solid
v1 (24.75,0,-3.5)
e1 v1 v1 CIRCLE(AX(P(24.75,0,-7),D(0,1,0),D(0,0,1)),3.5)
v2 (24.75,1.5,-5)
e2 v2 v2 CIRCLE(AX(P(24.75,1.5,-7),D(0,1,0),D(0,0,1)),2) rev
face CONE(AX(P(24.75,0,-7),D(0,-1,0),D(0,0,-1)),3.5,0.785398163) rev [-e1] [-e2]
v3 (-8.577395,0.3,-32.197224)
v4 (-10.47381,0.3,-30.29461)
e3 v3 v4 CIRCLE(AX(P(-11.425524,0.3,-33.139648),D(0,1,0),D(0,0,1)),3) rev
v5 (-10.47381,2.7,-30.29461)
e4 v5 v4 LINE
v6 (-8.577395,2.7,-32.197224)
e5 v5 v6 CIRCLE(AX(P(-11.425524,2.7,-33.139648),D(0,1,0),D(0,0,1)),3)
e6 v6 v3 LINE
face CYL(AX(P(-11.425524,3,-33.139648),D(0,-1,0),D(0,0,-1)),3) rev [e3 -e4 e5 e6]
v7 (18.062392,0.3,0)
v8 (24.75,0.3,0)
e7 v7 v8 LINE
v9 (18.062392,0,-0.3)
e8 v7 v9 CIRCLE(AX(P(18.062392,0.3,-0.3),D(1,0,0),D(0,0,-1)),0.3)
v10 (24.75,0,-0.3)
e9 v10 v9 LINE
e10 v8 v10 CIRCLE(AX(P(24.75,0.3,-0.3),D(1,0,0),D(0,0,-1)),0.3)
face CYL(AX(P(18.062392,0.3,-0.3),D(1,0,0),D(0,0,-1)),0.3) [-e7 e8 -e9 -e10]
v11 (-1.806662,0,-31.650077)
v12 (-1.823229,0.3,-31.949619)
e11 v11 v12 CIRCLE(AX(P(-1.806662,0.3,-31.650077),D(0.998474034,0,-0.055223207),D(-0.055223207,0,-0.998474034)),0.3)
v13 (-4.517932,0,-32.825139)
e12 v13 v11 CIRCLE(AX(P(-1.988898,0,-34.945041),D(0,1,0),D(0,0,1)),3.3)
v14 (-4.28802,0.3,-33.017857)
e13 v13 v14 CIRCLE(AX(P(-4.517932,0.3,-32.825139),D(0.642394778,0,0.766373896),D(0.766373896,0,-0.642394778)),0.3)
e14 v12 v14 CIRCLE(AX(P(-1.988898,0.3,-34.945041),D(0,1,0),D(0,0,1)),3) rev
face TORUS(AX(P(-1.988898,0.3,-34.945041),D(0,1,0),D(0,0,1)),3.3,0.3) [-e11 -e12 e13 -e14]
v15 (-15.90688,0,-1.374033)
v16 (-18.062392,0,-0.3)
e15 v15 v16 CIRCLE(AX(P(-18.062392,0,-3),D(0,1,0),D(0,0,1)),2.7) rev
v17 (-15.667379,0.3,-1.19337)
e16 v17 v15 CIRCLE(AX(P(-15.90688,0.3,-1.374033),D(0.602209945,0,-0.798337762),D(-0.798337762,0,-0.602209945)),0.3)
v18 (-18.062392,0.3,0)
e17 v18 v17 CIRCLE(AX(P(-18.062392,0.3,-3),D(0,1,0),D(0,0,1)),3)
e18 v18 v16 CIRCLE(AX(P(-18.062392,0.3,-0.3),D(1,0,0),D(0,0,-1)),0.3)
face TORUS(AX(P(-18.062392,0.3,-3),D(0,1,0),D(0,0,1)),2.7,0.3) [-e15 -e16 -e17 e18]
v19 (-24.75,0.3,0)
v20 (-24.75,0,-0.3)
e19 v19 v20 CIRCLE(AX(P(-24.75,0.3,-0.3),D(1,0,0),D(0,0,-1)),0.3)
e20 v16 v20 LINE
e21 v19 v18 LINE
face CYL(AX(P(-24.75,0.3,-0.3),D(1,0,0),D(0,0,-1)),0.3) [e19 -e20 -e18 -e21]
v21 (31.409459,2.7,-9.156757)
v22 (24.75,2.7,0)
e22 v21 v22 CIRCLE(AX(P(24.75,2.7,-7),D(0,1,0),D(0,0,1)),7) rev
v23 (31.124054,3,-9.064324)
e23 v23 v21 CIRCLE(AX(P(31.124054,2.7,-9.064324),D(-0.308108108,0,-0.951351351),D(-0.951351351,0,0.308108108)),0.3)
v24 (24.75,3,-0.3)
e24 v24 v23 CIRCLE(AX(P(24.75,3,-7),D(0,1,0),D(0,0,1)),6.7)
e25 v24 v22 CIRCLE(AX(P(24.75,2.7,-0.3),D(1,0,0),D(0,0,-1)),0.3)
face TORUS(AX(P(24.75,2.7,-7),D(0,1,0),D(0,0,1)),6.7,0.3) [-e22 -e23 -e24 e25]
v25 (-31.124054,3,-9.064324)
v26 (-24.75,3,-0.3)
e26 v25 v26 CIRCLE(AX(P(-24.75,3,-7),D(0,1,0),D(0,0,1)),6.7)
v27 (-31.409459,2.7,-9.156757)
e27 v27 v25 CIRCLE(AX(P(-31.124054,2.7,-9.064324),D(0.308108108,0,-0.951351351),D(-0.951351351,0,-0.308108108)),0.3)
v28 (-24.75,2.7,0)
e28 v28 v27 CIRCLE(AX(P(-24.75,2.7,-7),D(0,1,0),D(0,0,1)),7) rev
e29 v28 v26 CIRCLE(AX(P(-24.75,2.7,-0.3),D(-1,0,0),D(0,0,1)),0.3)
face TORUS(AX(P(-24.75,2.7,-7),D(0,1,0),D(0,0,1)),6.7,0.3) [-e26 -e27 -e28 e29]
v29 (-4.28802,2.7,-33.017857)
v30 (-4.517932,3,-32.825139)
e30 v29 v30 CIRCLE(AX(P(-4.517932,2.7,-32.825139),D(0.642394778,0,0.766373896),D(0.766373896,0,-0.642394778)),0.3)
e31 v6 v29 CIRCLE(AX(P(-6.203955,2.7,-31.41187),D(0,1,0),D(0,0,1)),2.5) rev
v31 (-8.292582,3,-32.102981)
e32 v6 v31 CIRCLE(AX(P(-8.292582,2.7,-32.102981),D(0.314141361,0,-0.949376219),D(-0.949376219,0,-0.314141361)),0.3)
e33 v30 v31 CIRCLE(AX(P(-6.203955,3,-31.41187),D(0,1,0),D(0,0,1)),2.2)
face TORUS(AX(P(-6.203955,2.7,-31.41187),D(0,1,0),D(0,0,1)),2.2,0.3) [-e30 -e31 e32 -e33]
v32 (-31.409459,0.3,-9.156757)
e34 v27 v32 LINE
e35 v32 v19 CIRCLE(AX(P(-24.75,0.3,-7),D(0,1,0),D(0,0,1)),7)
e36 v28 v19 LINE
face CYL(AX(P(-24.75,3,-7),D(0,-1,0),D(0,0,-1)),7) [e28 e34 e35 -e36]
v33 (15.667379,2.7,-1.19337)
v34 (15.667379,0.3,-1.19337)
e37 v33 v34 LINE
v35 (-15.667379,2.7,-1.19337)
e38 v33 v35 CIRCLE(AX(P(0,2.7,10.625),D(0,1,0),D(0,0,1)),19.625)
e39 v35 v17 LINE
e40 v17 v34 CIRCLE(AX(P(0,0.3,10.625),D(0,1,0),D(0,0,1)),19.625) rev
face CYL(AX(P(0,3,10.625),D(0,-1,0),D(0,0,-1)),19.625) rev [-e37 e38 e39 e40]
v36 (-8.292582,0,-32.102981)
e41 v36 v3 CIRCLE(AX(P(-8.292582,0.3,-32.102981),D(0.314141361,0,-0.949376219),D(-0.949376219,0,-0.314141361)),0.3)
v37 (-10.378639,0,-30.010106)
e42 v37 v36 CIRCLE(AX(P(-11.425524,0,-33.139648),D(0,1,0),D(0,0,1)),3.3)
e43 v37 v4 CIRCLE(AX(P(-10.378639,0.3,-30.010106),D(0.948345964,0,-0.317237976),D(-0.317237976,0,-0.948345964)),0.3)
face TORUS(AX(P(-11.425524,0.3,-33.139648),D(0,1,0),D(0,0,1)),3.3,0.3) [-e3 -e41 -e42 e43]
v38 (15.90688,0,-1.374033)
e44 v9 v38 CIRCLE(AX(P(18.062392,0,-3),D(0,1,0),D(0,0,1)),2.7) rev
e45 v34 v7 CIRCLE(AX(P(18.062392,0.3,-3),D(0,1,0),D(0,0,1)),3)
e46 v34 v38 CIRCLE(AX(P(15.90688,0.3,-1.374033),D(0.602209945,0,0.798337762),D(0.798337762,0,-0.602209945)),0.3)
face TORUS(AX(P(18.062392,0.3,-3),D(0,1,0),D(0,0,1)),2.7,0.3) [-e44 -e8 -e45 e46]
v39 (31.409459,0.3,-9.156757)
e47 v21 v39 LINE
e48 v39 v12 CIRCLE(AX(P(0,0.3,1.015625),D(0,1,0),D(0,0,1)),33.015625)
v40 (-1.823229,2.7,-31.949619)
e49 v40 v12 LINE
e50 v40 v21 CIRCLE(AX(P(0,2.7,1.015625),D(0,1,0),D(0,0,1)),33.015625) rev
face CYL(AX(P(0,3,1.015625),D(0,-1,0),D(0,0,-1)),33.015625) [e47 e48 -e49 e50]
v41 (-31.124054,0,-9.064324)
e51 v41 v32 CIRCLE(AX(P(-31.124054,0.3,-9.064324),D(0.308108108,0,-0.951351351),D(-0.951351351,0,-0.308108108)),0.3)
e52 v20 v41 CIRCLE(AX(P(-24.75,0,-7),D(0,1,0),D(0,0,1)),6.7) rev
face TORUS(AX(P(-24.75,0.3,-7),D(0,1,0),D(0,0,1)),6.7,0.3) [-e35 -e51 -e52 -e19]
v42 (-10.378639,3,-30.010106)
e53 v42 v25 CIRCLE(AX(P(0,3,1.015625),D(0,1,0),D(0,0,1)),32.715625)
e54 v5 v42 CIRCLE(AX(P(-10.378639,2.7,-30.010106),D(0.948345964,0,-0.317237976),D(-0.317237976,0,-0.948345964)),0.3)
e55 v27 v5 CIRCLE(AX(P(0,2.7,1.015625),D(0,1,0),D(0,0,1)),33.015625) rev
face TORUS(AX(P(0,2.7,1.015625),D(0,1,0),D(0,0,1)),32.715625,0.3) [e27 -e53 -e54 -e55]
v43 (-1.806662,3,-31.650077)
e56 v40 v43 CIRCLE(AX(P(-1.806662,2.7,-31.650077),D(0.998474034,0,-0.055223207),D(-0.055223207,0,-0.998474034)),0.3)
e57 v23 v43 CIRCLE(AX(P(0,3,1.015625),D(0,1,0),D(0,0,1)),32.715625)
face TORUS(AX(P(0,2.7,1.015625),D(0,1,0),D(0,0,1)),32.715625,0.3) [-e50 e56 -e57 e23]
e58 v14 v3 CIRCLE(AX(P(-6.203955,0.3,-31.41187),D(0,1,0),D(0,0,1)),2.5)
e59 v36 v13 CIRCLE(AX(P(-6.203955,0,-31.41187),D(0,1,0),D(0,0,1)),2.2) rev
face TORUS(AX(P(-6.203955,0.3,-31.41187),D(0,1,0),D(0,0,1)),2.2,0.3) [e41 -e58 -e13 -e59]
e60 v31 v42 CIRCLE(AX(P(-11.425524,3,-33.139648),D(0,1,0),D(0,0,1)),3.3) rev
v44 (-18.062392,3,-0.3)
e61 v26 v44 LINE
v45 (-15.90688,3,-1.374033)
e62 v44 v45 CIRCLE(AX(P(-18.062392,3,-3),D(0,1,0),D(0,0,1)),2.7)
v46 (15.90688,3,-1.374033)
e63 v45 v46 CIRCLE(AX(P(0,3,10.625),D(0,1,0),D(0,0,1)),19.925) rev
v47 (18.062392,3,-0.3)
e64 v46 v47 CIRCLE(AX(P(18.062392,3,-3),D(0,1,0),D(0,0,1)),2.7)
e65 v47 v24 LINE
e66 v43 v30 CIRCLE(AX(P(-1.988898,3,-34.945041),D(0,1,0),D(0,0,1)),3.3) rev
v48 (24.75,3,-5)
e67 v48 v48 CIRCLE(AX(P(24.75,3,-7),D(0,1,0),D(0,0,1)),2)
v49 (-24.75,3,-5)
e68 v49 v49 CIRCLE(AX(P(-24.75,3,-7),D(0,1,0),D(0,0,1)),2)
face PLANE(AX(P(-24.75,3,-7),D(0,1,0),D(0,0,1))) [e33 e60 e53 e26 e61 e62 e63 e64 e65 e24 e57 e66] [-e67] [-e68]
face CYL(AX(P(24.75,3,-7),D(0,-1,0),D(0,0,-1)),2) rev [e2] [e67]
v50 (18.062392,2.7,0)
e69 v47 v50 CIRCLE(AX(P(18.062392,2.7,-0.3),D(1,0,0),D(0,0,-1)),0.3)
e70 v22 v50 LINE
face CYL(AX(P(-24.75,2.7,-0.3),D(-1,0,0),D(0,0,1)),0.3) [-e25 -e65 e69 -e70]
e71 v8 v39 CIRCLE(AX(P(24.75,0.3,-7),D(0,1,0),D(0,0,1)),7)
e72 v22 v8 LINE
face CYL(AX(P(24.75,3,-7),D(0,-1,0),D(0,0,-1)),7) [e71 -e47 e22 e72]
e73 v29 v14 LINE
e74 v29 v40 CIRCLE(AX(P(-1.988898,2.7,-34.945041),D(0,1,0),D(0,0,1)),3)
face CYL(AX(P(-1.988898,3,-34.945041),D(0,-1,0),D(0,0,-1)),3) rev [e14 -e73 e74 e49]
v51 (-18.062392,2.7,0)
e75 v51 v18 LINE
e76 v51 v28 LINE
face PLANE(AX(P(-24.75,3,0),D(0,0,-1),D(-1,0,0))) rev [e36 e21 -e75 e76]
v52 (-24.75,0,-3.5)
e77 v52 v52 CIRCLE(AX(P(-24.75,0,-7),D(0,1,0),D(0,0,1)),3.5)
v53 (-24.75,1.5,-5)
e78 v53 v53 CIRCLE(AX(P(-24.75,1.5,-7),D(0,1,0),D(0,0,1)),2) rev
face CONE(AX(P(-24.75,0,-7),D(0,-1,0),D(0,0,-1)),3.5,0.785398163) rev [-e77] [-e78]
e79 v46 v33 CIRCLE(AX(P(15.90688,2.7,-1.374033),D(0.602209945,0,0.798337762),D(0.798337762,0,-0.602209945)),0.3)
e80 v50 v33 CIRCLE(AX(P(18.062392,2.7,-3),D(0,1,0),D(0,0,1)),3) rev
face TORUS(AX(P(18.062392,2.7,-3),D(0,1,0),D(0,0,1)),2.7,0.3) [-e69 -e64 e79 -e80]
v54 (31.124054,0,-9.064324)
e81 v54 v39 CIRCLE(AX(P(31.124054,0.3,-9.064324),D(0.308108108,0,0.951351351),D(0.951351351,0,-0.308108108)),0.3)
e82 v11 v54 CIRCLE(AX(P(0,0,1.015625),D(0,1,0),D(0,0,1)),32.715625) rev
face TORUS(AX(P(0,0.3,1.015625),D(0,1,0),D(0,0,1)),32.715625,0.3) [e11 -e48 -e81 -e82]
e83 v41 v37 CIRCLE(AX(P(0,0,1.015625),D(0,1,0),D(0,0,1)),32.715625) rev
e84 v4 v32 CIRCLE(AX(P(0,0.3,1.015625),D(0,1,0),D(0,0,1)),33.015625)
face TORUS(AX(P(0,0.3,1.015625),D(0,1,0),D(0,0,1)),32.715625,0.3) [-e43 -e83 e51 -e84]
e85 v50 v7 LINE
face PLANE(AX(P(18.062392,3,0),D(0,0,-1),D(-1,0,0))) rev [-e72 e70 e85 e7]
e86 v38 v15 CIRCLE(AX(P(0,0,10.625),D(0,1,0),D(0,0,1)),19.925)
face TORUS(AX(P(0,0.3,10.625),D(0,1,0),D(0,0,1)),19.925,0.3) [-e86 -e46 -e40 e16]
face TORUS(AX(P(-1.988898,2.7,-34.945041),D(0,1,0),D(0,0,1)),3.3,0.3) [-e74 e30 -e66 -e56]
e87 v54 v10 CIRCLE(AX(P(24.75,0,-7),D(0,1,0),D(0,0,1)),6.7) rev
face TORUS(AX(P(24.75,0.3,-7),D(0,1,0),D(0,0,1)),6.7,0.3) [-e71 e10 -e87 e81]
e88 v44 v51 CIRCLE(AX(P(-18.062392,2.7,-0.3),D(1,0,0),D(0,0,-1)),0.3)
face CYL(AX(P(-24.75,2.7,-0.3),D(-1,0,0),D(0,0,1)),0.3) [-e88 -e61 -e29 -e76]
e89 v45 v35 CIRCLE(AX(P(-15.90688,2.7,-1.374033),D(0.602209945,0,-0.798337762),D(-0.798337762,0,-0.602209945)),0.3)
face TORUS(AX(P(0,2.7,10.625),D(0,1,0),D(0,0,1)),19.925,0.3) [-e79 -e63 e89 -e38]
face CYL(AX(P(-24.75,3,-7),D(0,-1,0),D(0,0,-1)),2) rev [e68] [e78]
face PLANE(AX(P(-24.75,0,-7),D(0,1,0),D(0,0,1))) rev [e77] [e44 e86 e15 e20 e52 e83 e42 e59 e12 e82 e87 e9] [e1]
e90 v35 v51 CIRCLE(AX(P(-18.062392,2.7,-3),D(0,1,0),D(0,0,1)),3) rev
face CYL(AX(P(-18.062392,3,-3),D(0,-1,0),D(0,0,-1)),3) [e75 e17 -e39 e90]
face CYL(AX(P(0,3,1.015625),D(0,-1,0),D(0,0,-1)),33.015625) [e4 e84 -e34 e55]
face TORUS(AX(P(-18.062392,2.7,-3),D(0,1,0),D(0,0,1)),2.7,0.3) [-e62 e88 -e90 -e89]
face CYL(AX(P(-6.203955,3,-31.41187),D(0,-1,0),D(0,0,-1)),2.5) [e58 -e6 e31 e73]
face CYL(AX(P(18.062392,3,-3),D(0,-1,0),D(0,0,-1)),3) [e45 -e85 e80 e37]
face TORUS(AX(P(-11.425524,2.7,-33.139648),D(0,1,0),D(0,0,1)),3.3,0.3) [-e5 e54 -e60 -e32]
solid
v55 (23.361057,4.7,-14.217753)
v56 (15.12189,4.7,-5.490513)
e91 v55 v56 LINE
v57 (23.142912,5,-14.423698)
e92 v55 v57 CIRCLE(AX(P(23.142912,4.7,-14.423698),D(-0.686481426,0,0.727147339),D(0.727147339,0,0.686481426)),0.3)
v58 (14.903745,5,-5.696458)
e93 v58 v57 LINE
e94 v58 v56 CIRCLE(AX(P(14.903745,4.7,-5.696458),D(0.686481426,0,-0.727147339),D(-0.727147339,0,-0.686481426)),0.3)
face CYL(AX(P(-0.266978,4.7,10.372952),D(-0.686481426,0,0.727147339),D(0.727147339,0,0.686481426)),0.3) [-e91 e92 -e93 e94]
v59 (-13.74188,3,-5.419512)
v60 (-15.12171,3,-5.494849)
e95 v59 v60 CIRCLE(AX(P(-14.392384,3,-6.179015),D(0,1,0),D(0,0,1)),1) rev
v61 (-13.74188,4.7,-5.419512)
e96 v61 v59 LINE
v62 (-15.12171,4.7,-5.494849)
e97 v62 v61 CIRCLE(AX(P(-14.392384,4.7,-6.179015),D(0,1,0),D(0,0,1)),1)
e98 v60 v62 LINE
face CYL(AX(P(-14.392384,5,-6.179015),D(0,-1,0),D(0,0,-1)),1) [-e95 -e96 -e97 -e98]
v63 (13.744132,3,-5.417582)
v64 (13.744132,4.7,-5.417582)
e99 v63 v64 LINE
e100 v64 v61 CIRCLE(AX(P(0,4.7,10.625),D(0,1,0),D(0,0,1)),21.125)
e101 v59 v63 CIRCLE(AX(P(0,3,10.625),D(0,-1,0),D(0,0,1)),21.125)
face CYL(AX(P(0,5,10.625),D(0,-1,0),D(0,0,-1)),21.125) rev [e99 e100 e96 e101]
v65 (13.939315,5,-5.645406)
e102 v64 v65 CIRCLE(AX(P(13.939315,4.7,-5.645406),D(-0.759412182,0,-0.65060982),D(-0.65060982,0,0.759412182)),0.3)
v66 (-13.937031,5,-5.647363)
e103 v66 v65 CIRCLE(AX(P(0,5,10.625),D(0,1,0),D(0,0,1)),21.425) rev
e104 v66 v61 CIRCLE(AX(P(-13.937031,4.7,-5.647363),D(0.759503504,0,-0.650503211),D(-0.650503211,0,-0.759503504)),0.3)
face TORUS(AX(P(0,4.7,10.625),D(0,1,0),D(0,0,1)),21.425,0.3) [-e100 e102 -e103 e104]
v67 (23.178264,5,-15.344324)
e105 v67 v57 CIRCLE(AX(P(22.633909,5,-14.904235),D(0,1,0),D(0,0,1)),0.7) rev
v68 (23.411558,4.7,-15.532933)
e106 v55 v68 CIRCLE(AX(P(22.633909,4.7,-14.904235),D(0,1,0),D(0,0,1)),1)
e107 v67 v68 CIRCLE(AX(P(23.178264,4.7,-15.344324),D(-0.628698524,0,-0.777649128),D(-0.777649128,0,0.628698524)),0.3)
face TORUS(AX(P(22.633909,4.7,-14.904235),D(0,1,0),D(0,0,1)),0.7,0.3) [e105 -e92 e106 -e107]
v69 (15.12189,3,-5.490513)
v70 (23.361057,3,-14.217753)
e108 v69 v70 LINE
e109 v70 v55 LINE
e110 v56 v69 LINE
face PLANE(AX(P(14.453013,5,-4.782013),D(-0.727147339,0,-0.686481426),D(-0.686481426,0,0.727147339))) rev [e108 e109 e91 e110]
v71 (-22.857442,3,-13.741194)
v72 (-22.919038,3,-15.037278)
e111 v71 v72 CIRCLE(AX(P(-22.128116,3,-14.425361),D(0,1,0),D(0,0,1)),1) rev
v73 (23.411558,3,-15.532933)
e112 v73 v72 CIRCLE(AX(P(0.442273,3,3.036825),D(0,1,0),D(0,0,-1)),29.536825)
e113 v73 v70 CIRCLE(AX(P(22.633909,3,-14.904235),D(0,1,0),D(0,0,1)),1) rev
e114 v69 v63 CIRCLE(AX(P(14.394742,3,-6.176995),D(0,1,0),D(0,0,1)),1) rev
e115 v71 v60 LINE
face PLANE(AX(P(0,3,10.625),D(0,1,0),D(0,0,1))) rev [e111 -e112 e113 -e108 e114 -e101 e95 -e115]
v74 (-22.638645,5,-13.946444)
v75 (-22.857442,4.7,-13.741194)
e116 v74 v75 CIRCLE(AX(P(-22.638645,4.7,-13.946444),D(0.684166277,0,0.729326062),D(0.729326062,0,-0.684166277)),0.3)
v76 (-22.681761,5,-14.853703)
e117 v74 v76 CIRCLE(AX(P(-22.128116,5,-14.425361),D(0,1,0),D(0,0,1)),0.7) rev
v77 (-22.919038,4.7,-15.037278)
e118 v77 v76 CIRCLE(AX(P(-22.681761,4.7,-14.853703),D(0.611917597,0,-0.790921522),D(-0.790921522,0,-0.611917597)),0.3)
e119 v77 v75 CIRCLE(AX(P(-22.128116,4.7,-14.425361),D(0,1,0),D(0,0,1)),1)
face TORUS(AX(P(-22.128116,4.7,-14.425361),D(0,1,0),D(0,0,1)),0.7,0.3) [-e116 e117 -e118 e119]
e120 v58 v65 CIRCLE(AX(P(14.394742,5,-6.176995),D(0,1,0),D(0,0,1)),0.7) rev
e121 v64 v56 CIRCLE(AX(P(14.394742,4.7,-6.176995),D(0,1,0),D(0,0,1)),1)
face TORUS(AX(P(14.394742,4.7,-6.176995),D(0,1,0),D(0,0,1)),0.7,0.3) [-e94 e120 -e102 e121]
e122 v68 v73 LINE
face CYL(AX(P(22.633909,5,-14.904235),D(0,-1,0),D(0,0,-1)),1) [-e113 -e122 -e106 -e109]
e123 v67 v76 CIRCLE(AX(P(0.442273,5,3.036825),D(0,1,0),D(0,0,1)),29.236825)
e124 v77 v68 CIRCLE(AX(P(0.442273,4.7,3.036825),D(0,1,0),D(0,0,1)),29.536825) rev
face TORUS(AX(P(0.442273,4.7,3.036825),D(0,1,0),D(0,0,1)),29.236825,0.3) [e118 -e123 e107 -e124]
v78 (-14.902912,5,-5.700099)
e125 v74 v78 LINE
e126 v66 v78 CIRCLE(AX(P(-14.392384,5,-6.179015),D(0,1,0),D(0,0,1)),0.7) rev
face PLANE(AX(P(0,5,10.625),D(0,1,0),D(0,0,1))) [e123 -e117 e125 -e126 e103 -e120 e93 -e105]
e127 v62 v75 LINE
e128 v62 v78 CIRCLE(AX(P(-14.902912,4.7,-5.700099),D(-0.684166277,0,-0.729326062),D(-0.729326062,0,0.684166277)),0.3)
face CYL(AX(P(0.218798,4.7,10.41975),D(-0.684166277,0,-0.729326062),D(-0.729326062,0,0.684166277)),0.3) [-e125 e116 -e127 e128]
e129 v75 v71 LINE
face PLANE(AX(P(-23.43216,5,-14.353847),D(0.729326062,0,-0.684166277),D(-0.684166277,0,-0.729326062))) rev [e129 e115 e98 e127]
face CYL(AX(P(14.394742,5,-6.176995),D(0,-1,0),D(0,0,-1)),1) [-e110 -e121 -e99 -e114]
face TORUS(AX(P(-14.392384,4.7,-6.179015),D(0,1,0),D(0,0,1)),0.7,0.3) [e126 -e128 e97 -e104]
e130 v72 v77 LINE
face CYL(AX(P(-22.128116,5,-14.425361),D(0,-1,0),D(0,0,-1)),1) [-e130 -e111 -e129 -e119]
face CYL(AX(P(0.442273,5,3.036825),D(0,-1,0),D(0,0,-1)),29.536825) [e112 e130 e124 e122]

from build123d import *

# Parameters (mm, degrees)
SKETCH_1_R       = 1.9999999999999996
EXTRUDE_1_DEPTH  = 3
FILLET_1_R       = 0.3
CHAMFER_2_SIZE   = 1.5
EXTRUDE_2_DEPTH  = 2
FILLET_2_R       = 0.3
FILLET_START     = 2
FILLET_3_DEPTH   = 4
FILLET_3_2_ANGLE = 87.409478
FILLET_3_3_ANGLE = 80.898362
FILLET_3_4_ANGLE = 82.306392
FILLET_3_5_ANGLE = 87.235371


with BuildPart() as part:
    # Эскиз1 → Бобышка-Вытянуть1 (new body)
    with BuildSketch(Plane(origin=(0, 0, 0), x_dir=(1, 0, 0), z_dir=(0, 1, 0))):
        with BuildLine():
            Line((-24.74999999999514, 0), (-18.062391868178377, 0))
            ThreePointArc((-18.062391868178377, 0), (-16.724462404933302, 0.3148659714307076), (-15.667378581788512, 1.1933701657461677))
            ThreePointArc((-15.667378581788512, 1.1933701657461677), (7.11099e-12, 8.999999999999984), (15.667378581802726, 1.1933701657461642))
            ThreePointArc((15.667378581802726, 1.1933701657461642), (16.724462404947516, 0.3148659714307094), (18.06239186819259, 0))
            Line((18.06239186819259, 0), (24.74999999999514, 0))
            ThreePointArc((24.74999999999514, 0), (30.41115259011707, 2.8827981162741514), (31.409459459454997, 9.156756756755511))
            ThreePointArc((31.409459459454997, 9.156756756755511), (18.673909826346378, 26.211504594175647), (-1.8232287049257414, 31.949619291983687))
            ThreePointArc((-1.8232287049257414, 31.949619291983687), (-3.181872515199863, 32.192440336878796), (-4.288020016358429, 33.0178570611586))
            ThreePointArc((-4.288020016358429, 33.0178570611586), (-6.673728899130579, 33.86733590817873), (-8.577395305578529, 32.19722351739955))
            ThreePointArc((-8.577395305578529, 32.19722351739955), (-9.300744976260049, 31.02179154703082), (-10.473810036582254, 30.29460970781092))
            ThreePointArc((-10.473810036582254, 30.29460970781092), (-23.457499286252304, 22.21748114997415), (-31.409459459454997, 9.156756756755511))
            ThreePointArc((-31.409459459454997, 9.156756756755511), (-30.41115259011707, 2.8827981162741523), (-24.74999999999514, 0))
        make_face()
        with Locations(Location((-24.74999999999514, 7, 0), (0, 0, 270))):
            Circle(SKETCH_1_R, mode=Mode.SUBTRACT)
        with Locations(Location((24.74999999999514, 7, 0), (0, 0, 270))):
            Circle(SKETCH_1_R, mode=Mode.SUBTRACT)
    extrude(amount=EXTRUDE_1_DEPTH)

    # Скругление1
    fillet_1_edges = [part.edges().sort_by_distance(p)[0] for p in [
        (-16.724462404933302, 3, -0.3148659714307076),
        (-23.457499286252283, 0, -22.21748114997417),
        (-9.300744976260049, 0, -31.02179154703082),
        (-6.673728899130581, 0, -33.86733590817873),
        (-3.1818725151998644, 0, -32.192440336878796),
        (18.673909826346367, 0, -26.211504594175654),
        (30.41115259011707, 0, -2.8827981162741505),
        (7.10987e-12, 3, -8.99999999999998),
        (21.406195934093866, 0, 0),
        (16.724462404947516, 0, -0.3148659714307085),
        (7.10987e-12, 0, -8.99999999999998),
        (-16.724462404933302, 0, -0.3148659714307076),
        (-21.40619593408676, 0, 0),
        (-30.41115259011707, 0, -2.8827981162741514),
        (16.724462404947516, 3, -0.3148659714307085),
        (21.406195934093866, 3, 0),
        (30.41115259011707, 3, -2.8827981162741505),
        (18.673909826346367, 3, -26.211504594175654),
        (-3.1818725151998644, 3, -32.192440336878796),
        (-6.673728899130581, 3, -33.86733590817873),
        (-9.300744976260049, 3, -31.02179154703082),
        (-23.457499286252283, 3, -22.21748114997417),
        (-30.41115259011707, 3, -2.8827981162741514),
        (-21.40619593408676, 3, 0),
    ]]
    fillet(fillet_1_edges, radius=FILLET_1_R)

    # Фаска2
    chamfer_2_edges = [part.edges().sort_by_distance(p)[0] for p in [
        (-24.74999999999514, 0, -9),
        (24.74999999999514, 0, -9),
    ]]
    chamfer(chamfer_2_edges, length=CHAMFER_2_SIZE)


with BuildPart() as body_2:
    # Эскиз2 → Бобышка-Вытянуть2 (new body)
    with BuildSketch(Plane(origin=(0, 3, 0), x_dir=(1, 0, 0), z_dir=(0, 1, 0))):
        with BuildLine():
            Line((-23.432160134104283, 14.353847452342043), (-14.453012610993582, 4.782013061141572))
            ThreePointArc((-14.453012610993582, 4.782013061141572), (7.0692e-12, 10.499999999999913), (14.453012611007685, 4.782013061141572))
            Line((14.453012611007685, 4.782013061141572), (23.95204060293321, 14.843746221519005))
            ThreePointArc((23.95204060293321, 14.843746221519005), (0.13691164291233865, 26.498421500053468), (-23.432160134104283, 14.353847452342043))
        make_face()
    extrude(amount=EXTRUDE_2_DEPTH)

    # Скругление2
    fillet_2_edges = [body_2.edges().sort_by_distance(p)[0] for p in [
        (0.13691164291233893, 5, -26.498421500053468),
        (-18.94258637254893, 5, -9.567930256741807),
        (7.05214e-12, 5, -10.499999999999911),
        (19.202526606970448, 5, -9.812879641330287),
    ]]
    fillet(fillet_2_edges, radius=FILLET_2_R)

    # Скругление3: read off the stored shape, not the designer's step
    # Скругление3 outline → Скругление3 (cut)
    with BuildSketch(Plane(origin=(0, 0, 0), x_dir=(1, 0, 0), z_dir=(0, 1, 0)).offset(FILLET_START)):
        with BuildLine():
            ThreePointArc((-14.453012611, 4.782013061), (-14.101049536, 5.10478153), (-13.741880327, 5.419511525))
            ThreePointArc((-13.741880327, 5.419511525), (-14.446901286, 5.180502228), (-15.121709599, 5.494848752))
            Line((-15.121709599, 5.494848752), (-14.453012611, 4.782013061))
        make_face()
        with BuildLine():
            ThreePointArc((15.121889599, 5.490513107), (14.447602659, 5.178392621), (13.74413244, 5.41758235))
            ThreePointArc((13.74413244, 5.41758235), (14.102153536, 5.103791774), (14.453012611, 4.782013061))
            Line((14.453012611, 4.782013061), (15.121889599, 5.490513107))
        make_face()
        with BuildLine():
            Line((-23.432160134, 14.353847452), (-22.85744234, 13.741194243))
            ThreePointArc((-22.85744234, 13.741194243), (-23.126988908, 14.377889813), (-22.9190378, 15.037278118))
            ThreePointArc((-22.9190378, 15.037278118), (-23.178070893, 14.697418716), (-23.432160134, 14.353847452))
        make_face()
        with BuildLine():
            ThreePointArc((23.411558442, 15.532933405), (23.633172881, 14.865864012), (23.361056653, 14.217753456))
            Line((23.361056653, 14.217753456), (23.952040603, 14.843746222))
            ThreePointArc((23.952040603, 14.843746222), (23.684354184, 15.190343259), (23.411558442, 15.532933405))
        make_face()
    extrude(amount=FILLET_3_DEPTH, mode=Mode.SUBTRACT)

    # Fillet 3 2 outline → Fillet 3 2 (revolve, cut)
    with BuildSketch(Plane(origin=(-14.392383537, 0, -6.17901503), x_dir=(-0.7293260620658242, 0, 0.6841662774439833), z_dir=(-0.6841662774439833, 0, -0.7293260620658242))):
        with BuildLine():
            ThreePointArc((0.7, 5), (0.912132034, 4.912132034), (1, 4.7))
            Line((1, 4.7), (1, 5))
            Line((1, 5), (0.7, 5))
        make_face()
    revolve(axis=Axis((-14.392383537, 0, -6.17901503), (0, 1, 0)), revolution_arc=FILLET_3_2_ANGLE, mode=Mode.SUBTRACT)

    # Fillet 3 3 outline → Fillet 3 3 (revolve, cut)
    with BuildSketch(Plane(origin=(-22.128116278, 0, -14.42536052), x_dir=(-0.7909215222234117, 0, -0.6119175971352689), z_dir=(0.6119175971352689, 0, -0.7909215222234117))):
        with BuildLine():
            ThreePointArc((0.7, 5), (0.912132034, 4.912132034), (1, 4.7))
            Line((1, 4.7), (1, 5))
            Line((1, 5), (0.7, 5))
        make_face()
    revolve(axis=Axis((-22.128116278, 0, -14.42536052), (0, 1, 0)), revolution_arc=FILLET_3_3_ANGLE, mode=Mode.SUBTRACT)

    # Fillet 3 4 outline → Fillet 3 4 (revolve, cut)
    with BuildSketch(Plane(origin=(22.633909314, 0, -14.904234881), x_dir=(0.727147338715478, 0, 0.686481425676615), z_dir=(-0.686481425676615, 0, 0.727147338715478))):
        with BuildLine():
            ThreePointArc((0.7, 5), (0.912132034, 4.912132034), (1, 4.7))
            Line((1, 4.7), (1, 5))
            Line((1, 5), (0.7, 5))
        make_face()
    revolve(axis=Axis((22.633909314, 0, -14.904234881), (0, 0.9999999999999999, 0)), revolution_arc=FILLET_3_4_ANGLE, mode=Mode.SUBTRACT)

    # Fillet 3 5 outline → Fillet 3 5 (revolve, cut)
    with BuildSketch(Plane(origin=(14.39474226, 0, -6.176994533), x_dir=(-0.6506098196565728, 0, 0.7594121822610181), z_dir=(-0.7594121822610181, 0, -0.6506098196565728))):
        with BuildLine():
            ThreePointArc((0.7, 5), (0.912132034, 4.912132034), (1, 4.7))
            Line((1, 4.7), (1, 5))
            Line((1, 5), (0.7, 5))
        make_face()
    revolve(axis=Axis((14.39474226, 0, -6.176994533), (0, 1, 0)), revolution_arc=FILLET_3_5_ANGLE, mode=Mode.SUBTRACT)


solid = Compound([part.part, body_2.part])
